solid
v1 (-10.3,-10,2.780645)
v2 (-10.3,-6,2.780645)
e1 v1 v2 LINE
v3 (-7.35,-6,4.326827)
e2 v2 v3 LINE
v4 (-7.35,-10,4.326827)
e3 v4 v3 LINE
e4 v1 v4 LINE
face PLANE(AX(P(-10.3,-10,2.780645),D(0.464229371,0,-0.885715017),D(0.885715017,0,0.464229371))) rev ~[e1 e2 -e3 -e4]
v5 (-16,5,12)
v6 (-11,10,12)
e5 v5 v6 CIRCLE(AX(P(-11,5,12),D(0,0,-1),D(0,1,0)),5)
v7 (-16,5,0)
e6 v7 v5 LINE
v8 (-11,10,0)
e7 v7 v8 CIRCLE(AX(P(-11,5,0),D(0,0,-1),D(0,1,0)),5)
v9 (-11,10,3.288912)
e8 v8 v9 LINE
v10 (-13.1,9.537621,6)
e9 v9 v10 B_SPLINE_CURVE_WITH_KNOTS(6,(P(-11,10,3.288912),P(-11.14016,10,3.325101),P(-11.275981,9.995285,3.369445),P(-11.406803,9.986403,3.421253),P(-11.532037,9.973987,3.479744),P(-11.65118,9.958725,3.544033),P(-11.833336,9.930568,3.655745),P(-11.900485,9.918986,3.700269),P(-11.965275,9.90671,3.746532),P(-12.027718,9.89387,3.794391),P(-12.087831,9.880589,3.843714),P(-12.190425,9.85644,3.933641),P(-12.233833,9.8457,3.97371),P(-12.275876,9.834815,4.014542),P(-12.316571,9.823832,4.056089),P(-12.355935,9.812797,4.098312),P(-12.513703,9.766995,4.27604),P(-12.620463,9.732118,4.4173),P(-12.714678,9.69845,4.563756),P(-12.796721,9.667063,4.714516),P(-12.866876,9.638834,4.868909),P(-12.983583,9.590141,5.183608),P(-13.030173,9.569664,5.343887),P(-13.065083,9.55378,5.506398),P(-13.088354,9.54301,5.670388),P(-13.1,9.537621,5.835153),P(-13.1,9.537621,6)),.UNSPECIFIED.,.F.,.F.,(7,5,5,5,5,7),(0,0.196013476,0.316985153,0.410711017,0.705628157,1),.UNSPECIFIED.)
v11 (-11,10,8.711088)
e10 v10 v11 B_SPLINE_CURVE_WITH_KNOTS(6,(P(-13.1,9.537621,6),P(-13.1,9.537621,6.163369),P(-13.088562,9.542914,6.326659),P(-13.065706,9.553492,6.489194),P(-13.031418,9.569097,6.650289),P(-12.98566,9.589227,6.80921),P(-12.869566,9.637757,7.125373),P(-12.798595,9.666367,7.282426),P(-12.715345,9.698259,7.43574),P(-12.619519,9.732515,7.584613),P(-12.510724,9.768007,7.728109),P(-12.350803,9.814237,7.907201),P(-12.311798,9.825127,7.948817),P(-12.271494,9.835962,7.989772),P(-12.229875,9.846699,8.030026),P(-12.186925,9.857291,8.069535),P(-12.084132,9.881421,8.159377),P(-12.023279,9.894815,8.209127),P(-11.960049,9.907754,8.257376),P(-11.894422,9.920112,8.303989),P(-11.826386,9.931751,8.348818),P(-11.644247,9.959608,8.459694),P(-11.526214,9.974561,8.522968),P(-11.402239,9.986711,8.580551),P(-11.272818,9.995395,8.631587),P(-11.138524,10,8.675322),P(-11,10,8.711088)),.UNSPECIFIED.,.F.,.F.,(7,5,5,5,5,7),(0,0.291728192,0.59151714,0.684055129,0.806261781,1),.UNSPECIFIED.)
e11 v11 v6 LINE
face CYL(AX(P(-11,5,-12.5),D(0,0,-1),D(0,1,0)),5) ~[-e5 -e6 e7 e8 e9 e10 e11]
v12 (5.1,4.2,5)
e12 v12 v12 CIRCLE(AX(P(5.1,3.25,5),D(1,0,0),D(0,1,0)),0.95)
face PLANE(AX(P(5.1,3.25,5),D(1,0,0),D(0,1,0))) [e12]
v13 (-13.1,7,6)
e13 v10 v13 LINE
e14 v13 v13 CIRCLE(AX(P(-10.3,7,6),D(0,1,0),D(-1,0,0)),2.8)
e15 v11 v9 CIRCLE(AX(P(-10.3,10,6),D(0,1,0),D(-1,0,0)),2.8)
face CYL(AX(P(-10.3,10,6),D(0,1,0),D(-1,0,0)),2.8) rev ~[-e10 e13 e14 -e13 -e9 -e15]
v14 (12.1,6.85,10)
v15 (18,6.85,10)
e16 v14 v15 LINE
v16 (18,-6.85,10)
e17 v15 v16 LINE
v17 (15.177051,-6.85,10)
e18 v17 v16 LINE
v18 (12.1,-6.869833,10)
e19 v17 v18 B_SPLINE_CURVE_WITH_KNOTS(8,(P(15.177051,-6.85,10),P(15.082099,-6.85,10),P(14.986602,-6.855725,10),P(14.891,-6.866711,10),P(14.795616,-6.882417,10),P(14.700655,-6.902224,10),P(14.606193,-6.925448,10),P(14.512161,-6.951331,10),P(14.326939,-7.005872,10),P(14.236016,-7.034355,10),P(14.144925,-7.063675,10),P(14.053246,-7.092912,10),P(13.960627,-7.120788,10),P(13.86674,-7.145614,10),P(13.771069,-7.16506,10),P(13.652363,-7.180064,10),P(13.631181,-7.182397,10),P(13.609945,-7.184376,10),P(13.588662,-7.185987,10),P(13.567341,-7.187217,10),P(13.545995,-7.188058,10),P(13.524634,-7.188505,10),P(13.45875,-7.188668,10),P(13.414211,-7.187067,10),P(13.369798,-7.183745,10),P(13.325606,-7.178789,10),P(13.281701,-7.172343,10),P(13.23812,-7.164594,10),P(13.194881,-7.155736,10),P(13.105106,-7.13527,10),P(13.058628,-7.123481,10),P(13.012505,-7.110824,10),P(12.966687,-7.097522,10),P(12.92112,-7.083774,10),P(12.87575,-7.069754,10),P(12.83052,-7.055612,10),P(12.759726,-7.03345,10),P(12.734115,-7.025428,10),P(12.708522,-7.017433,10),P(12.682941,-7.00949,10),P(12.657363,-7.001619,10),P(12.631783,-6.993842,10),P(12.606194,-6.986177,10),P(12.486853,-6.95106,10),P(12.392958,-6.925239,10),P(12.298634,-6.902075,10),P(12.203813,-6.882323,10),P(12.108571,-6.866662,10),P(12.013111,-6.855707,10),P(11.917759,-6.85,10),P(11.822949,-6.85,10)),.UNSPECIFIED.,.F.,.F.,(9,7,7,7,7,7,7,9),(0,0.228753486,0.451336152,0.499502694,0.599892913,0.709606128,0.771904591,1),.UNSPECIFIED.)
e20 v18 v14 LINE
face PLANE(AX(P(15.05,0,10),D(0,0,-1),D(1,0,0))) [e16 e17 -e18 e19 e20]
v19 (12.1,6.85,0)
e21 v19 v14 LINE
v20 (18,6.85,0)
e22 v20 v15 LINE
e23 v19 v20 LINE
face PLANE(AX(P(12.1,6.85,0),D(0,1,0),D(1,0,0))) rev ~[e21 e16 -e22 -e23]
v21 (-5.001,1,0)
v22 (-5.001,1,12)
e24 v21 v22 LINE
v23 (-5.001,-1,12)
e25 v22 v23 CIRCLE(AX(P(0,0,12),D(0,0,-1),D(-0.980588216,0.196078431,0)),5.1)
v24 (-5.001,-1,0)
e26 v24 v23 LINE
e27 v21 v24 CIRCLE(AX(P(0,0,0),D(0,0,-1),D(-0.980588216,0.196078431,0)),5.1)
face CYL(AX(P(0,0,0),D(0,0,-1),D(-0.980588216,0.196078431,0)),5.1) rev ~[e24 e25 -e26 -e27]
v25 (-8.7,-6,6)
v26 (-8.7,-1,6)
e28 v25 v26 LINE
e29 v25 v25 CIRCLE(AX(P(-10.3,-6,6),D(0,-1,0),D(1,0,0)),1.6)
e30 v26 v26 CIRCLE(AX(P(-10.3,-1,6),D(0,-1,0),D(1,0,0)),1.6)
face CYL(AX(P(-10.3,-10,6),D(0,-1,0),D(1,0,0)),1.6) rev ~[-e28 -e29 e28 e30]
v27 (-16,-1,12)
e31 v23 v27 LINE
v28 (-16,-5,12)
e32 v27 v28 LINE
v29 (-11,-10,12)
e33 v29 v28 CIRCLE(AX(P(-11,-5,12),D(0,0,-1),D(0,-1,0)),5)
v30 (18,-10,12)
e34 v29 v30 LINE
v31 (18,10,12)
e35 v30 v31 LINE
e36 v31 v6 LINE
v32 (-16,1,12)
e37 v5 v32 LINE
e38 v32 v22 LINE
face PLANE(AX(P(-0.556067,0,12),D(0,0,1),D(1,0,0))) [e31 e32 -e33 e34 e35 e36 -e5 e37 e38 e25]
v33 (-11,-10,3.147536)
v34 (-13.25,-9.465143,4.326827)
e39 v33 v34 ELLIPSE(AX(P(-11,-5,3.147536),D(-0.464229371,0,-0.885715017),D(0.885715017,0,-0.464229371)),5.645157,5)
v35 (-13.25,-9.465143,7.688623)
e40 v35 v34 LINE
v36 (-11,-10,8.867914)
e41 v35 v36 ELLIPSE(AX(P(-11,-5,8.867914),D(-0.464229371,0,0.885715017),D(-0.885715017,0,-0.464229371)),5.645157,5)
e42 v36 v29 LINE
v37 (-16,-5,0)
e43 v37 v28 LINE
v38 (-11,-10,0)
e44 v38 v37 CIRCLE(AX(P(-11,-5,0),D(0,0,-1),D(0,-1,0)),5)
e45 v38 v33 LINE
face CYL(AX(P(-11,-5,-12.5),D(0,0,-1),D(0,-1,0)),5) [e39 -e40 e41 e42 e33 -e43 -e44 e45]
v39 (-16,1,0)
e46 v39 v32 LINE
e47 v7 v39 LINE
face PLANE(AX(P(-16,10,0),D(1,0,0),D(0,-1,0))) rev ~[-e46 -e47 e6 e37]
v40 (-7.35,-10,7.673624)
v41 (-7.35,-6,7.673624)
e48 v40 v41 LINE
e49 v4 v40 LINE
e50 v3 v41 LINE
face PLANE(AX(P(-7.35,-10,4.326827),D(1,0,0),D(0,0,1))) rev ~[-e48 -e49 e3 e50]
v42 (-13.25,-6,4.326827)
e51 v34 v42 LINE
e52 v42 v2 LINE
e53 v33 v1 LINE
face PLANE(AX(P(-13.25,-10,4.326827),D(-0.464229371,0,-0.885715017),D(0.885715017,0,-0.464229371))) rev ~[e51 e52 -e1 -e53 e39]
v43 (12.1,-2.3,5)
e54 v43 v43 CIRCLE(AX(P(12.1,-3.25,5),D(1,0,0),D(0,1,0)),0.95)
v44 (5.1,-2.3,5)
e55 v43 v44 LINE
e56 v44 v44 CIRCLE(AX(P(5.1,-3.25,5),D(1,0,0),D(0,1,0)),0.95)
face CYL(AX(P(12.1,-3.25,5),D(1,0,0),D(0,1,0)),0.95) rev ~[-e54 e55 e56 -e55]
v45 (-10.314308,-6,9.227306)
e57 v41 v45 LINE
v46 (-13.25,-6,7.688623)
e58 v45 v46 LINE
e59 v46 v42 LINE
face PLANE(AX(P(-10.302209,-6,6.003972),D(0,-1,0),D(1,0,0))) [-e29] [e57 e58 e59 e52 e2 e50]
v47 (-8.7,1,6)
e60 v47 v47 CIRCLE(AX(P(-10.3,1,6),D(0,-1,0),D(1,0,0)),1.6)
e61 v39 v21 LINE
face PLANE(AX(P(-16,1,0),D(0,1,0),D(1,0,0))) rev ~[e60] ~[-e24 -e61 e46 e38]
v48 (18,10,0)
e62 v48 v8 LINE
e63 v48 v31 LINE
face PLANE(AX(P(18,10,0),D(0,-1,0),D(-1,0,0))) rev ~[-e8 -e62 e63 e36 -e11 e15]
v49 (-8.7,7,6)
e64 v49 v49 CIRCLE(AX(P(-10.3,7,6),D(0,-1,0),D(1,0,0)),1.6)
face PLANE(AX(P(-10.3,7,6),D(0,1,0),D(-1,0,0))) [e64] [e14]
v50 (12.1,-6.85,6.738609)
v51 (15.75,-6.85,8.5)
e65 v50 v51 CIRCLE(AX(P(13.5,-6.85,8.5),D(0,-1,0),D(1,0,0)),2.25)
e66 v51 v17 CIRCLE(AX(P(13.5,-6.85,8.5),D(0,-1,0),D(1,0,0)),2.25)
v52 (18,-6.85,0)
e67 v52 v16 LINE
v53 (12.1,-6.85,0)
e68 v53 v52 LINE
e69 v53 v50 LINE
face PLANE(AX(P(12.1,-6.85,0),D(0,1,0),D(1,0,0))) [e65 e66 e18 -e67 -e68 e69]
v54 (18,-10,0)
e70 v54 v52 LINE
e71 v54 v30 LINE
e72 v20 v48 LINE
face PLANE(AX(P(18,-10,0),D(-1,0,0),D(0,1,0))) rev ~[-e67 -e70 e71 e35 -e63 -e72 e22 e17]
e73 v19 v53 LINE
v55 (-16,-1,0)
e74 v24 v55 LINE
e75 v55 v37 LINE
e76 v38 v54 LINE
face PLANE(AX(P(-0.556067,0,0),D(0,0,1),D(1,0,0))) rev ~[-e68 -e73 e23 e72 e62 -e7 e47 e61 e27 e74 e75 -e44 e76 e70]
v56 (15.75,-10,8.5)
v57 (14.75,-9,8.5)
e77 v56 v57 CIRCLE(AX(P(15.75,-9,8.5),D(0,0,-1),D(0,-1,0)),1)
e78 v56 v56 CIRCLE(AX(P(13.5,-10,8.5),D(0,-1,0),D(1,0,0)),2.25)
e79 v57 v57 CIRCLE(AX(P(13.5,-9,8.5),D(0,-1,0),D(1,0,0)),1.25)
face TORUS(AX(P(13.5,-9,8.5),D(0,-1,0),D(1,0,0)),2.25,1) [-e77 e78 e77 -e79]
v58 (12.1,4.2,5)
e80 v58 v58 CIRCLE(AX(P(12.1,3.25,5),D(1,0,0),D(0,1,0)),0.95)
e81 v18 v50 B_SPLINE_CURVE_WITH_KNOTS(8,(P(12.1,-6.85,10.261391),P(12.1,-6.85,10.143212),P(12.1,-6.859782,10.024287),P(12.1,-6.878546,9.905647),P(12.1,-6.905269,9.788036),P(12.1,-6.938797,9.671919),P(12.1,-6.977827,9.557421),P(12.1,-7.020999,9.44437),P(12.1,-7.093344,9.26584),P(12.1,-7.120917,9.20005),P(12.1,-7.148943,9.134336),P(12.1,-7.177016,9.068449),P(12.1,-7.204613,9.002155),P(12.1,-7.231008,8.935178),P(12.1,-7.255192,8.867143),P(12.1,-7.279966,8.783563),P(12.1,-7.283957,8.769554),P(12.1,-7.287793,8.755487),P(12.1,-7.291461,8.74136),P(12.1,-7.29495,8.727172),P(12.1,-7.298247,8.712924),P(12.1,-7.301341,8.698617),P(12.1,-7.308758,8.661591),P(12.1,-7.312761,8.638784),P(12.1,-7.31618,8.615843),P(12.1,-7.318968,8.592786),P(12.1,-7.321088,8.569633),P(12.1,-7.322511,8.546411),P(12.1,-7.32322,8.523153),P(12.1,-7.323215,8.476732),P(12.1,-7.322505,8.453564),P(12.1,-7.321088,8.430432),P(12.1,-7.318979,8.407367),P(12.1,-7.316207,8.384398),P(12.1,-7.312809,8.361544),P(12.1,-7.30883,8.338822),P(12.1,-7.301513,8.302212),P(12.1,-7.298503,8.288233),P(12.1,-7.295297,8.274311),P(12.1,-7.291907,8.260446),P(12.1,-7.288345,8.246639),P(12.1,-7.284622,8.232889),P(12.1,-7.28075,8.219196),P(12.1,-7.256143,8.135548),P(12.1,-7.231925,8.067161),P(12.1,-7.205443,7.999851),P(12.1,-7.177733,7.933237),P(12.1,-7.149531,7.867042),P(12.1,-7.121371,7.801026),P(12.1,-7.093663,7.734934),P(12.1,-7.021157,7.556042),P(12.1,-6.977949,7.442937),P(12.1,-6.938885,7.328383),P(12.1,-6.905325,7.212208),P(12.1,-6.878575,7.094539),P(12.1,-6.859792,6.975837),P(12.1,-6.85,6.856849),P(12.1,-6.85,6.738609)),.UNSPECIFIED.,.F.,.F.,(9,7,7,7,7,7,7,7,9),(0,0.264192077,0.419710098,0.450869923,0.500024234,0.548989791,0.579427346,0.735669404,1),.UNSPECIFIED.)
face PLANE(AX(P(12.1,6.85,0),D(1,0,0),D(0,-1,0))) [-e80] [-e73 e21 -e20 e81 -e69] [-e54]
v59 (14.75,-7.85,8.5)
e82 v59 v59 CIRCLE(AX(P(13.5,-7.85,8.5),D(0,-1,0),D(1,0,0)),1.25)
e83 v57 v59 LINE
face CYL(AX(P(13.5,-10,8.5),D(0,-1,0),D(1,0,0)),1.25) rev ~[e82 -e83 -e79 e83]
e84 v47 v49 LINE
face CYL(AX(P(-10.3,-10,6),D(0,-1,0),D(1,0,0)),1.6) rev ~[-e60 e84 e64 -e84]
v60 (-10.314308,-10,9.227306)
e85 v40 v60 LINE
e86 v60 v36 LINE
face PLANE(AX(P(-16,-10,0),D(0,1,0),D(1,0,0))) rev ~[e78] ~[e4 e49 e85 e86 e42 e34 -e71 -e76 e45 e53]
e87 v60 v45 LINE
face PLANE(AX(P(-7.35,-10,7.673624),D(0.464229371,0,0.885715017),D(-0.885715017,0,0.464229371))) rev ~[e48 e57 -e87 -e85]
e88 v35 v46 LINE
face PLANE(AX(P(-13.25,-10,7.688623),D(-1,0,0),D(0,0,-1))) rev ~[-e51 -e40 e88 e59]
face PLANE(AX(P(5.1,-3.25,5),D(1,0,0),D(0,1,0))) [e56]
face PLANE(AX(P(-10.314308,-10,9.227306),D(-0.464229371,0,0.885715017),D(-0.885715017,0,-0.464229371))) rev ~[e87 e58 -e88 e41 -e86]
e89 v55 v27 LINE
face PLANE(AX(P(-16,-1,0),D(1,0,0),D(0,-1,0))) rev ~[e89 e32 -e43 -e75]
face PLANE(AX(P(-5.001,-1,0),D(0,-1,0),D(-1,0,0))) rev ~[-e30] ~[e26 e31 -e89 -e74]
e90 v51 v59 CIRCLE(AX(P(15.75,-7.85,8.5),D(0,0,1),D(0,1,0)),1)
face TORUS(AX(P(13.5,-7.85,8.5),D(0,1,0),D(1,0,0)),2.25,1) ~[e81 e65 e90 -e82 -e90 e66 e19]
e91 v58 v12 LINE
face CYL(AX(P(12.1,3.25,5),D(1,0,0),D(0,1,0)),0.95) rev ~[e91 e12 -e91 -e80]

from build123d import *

# Parameters (mm, degrees)
F1_DEPTH     = 12
F2_W         = 5.9
F2_H         = 13.7
F3_DEPTH     = 10
F4_R         = 1.6
F5_DEPTH     = 20.001
F6_R         = 1.25
F7_DEPTH     = 16
F9_R         = 0.95
F10_DEPTH    = 7
F11_R        = 1.6
F12_DEPTH    = 4
F13_R        = 2.8
F14_DEPTH    = 3
F15_T1_DEPTH = 37


# Not quite as in the source:
# - a fillet or chamfer that OpenCascade refuses, or shapes differently, is made with other operations: its cross-section is extruded or revolved along the edge and cut away or added


with BuildPart() as f1:
    # F0 (on Top) → F1 (new body)
    with BuildSketch(Plane.XY):
        with BuildLine():
            Line((18, 10), (-16, 10))
            Line((-16, 10), (-16, 1))
            Line((-16, 1), (-5.0009999, 1))
            ThreePointArc((-5.0009999, 1), (5.1, 0), (-5.0009999, -1))
            Line((-5.0009999, -1), (-16, -1))
            Line((-16, -1), (-16, -10))
            Line((-16, -10), (18, -10))
            Line((18, -10), (18, -6.85))
            Line((18, -6.85), (18, 6.85))
            Line((18, 6.85), (18, 10))
        make_face()
    extrude(amount=F1_DEPTH)

    # F2 (on face) → F3 (cut)
    with BuildSketch(Plane(origin=(0, 0, 0), x_dir=(1, 0, 0), z_dir=(0, 0, -1))):
        with Locations((15.05, 0)):
            Rectangle(F2_W, F2_H)
    extrude(amount=-F3_DEPTH, mode=Mode.SUBTRACT)

    # F4 (on face) → F5 (cut, through all)
    with BuildSketch(Plane.XZ.offset(10)):
        with Locations((-10.3, 6)):
            Circle(F4_R)
    extrude(amount=-F5_DEPTH, mode=Mode.SUBTRACT)

    # F6 (on face) → F7 (cut)
    with BuildSketch(Plane.XZ.offset(10)):
        with Locations((13.5, 8.5)):
            Circle(F6_R)
    extrude(amount=-F7_DEPTH, mode=Mode.SUBTRACT)

    # F8: fillet of radius 1 on 2 edges, made by hand

    # F8_s1 → F8_t2 (revolve, cut)
    with BuildSketch(Plane.XY.offset(8.5)):
        with BuildLine():
            ThreePointArc((15.75, -10), (15.0428932188, -9.7071067812), (14.75, -9))
            Line((14.75, -9), (14.75, -10))
            Line((14.75, -10), (15.75, -10))
        make_face()
    revolve(axis=Axis((13.5, -10, 8.5), (0, -1, 0)), mode=Mode.SUBTRACT)


with BuildPart() as f8_tool4:
    # F8_s5 → F8_t6 (revolve)
    with BuildSketch(Plane.XY.offset(8.5)):
        with BuildLine():
            ThreePointArc((15.75, -6.85), (15.0428932188, -7.1428932188), (14.75, -7.85))
            Line((14.75, -7.85), (14.75, -6.85))
            Line((14.75, -6.85), (15.75, -6.85))
        make_face()
    revolve(axis=Axis((13.5, -6.85, 8.5), (0, -1, 0)))

    split(bisect_by=Plane.XY.offset(10), keep=Keep.BOTTOM)

    split(bisect_by=Plane.YZ.offset(12.1), keep=Keep.TOP)


with BuildPart() as f1_1:
    add(f1.part)

    # F8_t3: cut F8_tool4
    add(f8_tool4.part, mode=Mode.SUBTRACT)

    # F9 (on face) → F10 (cut)
    with BuildSketch(Plane.YZ.offset(12.1)):
        with Locations((46.374425292, 0.8309943862)):
            Circle(F9_R)
        with Locations((46.374425292, -5.6690056138)):
            Circle(F9_R)
        with Locations((-3.25, 5)):
            Circle(F9_R)
        with Locations((3.25, 5)):
            Circle(F9_R)
    extrude(amount=-F10_DEPTH, mode=Mode.SUBTRACT)

    # F11 (on face) → F12 (cut)
    with BuildSketch(Plane.XZ.offset(10)):
        Polygon((-7.35, 7.6736242323), (-10.3143082515, 9.227305642), (-13.25, 7.6886229858), (-13.25, 4.3268273558), (-10.3, 2.7806453228), (-7.35, 4.3268273558), align=None)
        with Locations((-10.3, 6)):
            Circle(F11_R, mode=Mode.SUBTRACT)
    extrude(amount=-F12_DEPTH, mode=Mode.SUBTRACT)

    # F13 (on face) → F14 (cut)
    with BuildSketch(Plane(origin=(0, 10, 0), x_dir=(-1, 0, 0), z_dir=(0, 1, 0))):
        with Locations((10.3, 6)):
            Circle(F13_R)
    extrude(amount=-F14_DEPTH, mode=Mode.SUBTRACT)

    # F15: fillet of radius 5 on 2 edges, made by hand

    # F15_s2 → F15_t1 (cut)
    with BuildSketch(Plane.XY.offset(-12.5)):
        with BuildLine():
            ThreePointArc((-11, -10), (-14.5355339059, -8.5355339059), (-16, -5))
            Line((-16, -5), (-16, -10))
            Line((-16, -10), (-11, -10))
        make_face()
        with BuildLine():
            ThreePointArc((-11, 10), (-14.5355339059, 8.5355339059), (-16, 5))
            Line((-16, 5), (-16, 10))
            Line((-16, 10), (-11, 10))
        make_face()
    extrude(amount=F15_T1_DEPTH, mode=Mode.SUBTRACT)


solid = f1_1.part
